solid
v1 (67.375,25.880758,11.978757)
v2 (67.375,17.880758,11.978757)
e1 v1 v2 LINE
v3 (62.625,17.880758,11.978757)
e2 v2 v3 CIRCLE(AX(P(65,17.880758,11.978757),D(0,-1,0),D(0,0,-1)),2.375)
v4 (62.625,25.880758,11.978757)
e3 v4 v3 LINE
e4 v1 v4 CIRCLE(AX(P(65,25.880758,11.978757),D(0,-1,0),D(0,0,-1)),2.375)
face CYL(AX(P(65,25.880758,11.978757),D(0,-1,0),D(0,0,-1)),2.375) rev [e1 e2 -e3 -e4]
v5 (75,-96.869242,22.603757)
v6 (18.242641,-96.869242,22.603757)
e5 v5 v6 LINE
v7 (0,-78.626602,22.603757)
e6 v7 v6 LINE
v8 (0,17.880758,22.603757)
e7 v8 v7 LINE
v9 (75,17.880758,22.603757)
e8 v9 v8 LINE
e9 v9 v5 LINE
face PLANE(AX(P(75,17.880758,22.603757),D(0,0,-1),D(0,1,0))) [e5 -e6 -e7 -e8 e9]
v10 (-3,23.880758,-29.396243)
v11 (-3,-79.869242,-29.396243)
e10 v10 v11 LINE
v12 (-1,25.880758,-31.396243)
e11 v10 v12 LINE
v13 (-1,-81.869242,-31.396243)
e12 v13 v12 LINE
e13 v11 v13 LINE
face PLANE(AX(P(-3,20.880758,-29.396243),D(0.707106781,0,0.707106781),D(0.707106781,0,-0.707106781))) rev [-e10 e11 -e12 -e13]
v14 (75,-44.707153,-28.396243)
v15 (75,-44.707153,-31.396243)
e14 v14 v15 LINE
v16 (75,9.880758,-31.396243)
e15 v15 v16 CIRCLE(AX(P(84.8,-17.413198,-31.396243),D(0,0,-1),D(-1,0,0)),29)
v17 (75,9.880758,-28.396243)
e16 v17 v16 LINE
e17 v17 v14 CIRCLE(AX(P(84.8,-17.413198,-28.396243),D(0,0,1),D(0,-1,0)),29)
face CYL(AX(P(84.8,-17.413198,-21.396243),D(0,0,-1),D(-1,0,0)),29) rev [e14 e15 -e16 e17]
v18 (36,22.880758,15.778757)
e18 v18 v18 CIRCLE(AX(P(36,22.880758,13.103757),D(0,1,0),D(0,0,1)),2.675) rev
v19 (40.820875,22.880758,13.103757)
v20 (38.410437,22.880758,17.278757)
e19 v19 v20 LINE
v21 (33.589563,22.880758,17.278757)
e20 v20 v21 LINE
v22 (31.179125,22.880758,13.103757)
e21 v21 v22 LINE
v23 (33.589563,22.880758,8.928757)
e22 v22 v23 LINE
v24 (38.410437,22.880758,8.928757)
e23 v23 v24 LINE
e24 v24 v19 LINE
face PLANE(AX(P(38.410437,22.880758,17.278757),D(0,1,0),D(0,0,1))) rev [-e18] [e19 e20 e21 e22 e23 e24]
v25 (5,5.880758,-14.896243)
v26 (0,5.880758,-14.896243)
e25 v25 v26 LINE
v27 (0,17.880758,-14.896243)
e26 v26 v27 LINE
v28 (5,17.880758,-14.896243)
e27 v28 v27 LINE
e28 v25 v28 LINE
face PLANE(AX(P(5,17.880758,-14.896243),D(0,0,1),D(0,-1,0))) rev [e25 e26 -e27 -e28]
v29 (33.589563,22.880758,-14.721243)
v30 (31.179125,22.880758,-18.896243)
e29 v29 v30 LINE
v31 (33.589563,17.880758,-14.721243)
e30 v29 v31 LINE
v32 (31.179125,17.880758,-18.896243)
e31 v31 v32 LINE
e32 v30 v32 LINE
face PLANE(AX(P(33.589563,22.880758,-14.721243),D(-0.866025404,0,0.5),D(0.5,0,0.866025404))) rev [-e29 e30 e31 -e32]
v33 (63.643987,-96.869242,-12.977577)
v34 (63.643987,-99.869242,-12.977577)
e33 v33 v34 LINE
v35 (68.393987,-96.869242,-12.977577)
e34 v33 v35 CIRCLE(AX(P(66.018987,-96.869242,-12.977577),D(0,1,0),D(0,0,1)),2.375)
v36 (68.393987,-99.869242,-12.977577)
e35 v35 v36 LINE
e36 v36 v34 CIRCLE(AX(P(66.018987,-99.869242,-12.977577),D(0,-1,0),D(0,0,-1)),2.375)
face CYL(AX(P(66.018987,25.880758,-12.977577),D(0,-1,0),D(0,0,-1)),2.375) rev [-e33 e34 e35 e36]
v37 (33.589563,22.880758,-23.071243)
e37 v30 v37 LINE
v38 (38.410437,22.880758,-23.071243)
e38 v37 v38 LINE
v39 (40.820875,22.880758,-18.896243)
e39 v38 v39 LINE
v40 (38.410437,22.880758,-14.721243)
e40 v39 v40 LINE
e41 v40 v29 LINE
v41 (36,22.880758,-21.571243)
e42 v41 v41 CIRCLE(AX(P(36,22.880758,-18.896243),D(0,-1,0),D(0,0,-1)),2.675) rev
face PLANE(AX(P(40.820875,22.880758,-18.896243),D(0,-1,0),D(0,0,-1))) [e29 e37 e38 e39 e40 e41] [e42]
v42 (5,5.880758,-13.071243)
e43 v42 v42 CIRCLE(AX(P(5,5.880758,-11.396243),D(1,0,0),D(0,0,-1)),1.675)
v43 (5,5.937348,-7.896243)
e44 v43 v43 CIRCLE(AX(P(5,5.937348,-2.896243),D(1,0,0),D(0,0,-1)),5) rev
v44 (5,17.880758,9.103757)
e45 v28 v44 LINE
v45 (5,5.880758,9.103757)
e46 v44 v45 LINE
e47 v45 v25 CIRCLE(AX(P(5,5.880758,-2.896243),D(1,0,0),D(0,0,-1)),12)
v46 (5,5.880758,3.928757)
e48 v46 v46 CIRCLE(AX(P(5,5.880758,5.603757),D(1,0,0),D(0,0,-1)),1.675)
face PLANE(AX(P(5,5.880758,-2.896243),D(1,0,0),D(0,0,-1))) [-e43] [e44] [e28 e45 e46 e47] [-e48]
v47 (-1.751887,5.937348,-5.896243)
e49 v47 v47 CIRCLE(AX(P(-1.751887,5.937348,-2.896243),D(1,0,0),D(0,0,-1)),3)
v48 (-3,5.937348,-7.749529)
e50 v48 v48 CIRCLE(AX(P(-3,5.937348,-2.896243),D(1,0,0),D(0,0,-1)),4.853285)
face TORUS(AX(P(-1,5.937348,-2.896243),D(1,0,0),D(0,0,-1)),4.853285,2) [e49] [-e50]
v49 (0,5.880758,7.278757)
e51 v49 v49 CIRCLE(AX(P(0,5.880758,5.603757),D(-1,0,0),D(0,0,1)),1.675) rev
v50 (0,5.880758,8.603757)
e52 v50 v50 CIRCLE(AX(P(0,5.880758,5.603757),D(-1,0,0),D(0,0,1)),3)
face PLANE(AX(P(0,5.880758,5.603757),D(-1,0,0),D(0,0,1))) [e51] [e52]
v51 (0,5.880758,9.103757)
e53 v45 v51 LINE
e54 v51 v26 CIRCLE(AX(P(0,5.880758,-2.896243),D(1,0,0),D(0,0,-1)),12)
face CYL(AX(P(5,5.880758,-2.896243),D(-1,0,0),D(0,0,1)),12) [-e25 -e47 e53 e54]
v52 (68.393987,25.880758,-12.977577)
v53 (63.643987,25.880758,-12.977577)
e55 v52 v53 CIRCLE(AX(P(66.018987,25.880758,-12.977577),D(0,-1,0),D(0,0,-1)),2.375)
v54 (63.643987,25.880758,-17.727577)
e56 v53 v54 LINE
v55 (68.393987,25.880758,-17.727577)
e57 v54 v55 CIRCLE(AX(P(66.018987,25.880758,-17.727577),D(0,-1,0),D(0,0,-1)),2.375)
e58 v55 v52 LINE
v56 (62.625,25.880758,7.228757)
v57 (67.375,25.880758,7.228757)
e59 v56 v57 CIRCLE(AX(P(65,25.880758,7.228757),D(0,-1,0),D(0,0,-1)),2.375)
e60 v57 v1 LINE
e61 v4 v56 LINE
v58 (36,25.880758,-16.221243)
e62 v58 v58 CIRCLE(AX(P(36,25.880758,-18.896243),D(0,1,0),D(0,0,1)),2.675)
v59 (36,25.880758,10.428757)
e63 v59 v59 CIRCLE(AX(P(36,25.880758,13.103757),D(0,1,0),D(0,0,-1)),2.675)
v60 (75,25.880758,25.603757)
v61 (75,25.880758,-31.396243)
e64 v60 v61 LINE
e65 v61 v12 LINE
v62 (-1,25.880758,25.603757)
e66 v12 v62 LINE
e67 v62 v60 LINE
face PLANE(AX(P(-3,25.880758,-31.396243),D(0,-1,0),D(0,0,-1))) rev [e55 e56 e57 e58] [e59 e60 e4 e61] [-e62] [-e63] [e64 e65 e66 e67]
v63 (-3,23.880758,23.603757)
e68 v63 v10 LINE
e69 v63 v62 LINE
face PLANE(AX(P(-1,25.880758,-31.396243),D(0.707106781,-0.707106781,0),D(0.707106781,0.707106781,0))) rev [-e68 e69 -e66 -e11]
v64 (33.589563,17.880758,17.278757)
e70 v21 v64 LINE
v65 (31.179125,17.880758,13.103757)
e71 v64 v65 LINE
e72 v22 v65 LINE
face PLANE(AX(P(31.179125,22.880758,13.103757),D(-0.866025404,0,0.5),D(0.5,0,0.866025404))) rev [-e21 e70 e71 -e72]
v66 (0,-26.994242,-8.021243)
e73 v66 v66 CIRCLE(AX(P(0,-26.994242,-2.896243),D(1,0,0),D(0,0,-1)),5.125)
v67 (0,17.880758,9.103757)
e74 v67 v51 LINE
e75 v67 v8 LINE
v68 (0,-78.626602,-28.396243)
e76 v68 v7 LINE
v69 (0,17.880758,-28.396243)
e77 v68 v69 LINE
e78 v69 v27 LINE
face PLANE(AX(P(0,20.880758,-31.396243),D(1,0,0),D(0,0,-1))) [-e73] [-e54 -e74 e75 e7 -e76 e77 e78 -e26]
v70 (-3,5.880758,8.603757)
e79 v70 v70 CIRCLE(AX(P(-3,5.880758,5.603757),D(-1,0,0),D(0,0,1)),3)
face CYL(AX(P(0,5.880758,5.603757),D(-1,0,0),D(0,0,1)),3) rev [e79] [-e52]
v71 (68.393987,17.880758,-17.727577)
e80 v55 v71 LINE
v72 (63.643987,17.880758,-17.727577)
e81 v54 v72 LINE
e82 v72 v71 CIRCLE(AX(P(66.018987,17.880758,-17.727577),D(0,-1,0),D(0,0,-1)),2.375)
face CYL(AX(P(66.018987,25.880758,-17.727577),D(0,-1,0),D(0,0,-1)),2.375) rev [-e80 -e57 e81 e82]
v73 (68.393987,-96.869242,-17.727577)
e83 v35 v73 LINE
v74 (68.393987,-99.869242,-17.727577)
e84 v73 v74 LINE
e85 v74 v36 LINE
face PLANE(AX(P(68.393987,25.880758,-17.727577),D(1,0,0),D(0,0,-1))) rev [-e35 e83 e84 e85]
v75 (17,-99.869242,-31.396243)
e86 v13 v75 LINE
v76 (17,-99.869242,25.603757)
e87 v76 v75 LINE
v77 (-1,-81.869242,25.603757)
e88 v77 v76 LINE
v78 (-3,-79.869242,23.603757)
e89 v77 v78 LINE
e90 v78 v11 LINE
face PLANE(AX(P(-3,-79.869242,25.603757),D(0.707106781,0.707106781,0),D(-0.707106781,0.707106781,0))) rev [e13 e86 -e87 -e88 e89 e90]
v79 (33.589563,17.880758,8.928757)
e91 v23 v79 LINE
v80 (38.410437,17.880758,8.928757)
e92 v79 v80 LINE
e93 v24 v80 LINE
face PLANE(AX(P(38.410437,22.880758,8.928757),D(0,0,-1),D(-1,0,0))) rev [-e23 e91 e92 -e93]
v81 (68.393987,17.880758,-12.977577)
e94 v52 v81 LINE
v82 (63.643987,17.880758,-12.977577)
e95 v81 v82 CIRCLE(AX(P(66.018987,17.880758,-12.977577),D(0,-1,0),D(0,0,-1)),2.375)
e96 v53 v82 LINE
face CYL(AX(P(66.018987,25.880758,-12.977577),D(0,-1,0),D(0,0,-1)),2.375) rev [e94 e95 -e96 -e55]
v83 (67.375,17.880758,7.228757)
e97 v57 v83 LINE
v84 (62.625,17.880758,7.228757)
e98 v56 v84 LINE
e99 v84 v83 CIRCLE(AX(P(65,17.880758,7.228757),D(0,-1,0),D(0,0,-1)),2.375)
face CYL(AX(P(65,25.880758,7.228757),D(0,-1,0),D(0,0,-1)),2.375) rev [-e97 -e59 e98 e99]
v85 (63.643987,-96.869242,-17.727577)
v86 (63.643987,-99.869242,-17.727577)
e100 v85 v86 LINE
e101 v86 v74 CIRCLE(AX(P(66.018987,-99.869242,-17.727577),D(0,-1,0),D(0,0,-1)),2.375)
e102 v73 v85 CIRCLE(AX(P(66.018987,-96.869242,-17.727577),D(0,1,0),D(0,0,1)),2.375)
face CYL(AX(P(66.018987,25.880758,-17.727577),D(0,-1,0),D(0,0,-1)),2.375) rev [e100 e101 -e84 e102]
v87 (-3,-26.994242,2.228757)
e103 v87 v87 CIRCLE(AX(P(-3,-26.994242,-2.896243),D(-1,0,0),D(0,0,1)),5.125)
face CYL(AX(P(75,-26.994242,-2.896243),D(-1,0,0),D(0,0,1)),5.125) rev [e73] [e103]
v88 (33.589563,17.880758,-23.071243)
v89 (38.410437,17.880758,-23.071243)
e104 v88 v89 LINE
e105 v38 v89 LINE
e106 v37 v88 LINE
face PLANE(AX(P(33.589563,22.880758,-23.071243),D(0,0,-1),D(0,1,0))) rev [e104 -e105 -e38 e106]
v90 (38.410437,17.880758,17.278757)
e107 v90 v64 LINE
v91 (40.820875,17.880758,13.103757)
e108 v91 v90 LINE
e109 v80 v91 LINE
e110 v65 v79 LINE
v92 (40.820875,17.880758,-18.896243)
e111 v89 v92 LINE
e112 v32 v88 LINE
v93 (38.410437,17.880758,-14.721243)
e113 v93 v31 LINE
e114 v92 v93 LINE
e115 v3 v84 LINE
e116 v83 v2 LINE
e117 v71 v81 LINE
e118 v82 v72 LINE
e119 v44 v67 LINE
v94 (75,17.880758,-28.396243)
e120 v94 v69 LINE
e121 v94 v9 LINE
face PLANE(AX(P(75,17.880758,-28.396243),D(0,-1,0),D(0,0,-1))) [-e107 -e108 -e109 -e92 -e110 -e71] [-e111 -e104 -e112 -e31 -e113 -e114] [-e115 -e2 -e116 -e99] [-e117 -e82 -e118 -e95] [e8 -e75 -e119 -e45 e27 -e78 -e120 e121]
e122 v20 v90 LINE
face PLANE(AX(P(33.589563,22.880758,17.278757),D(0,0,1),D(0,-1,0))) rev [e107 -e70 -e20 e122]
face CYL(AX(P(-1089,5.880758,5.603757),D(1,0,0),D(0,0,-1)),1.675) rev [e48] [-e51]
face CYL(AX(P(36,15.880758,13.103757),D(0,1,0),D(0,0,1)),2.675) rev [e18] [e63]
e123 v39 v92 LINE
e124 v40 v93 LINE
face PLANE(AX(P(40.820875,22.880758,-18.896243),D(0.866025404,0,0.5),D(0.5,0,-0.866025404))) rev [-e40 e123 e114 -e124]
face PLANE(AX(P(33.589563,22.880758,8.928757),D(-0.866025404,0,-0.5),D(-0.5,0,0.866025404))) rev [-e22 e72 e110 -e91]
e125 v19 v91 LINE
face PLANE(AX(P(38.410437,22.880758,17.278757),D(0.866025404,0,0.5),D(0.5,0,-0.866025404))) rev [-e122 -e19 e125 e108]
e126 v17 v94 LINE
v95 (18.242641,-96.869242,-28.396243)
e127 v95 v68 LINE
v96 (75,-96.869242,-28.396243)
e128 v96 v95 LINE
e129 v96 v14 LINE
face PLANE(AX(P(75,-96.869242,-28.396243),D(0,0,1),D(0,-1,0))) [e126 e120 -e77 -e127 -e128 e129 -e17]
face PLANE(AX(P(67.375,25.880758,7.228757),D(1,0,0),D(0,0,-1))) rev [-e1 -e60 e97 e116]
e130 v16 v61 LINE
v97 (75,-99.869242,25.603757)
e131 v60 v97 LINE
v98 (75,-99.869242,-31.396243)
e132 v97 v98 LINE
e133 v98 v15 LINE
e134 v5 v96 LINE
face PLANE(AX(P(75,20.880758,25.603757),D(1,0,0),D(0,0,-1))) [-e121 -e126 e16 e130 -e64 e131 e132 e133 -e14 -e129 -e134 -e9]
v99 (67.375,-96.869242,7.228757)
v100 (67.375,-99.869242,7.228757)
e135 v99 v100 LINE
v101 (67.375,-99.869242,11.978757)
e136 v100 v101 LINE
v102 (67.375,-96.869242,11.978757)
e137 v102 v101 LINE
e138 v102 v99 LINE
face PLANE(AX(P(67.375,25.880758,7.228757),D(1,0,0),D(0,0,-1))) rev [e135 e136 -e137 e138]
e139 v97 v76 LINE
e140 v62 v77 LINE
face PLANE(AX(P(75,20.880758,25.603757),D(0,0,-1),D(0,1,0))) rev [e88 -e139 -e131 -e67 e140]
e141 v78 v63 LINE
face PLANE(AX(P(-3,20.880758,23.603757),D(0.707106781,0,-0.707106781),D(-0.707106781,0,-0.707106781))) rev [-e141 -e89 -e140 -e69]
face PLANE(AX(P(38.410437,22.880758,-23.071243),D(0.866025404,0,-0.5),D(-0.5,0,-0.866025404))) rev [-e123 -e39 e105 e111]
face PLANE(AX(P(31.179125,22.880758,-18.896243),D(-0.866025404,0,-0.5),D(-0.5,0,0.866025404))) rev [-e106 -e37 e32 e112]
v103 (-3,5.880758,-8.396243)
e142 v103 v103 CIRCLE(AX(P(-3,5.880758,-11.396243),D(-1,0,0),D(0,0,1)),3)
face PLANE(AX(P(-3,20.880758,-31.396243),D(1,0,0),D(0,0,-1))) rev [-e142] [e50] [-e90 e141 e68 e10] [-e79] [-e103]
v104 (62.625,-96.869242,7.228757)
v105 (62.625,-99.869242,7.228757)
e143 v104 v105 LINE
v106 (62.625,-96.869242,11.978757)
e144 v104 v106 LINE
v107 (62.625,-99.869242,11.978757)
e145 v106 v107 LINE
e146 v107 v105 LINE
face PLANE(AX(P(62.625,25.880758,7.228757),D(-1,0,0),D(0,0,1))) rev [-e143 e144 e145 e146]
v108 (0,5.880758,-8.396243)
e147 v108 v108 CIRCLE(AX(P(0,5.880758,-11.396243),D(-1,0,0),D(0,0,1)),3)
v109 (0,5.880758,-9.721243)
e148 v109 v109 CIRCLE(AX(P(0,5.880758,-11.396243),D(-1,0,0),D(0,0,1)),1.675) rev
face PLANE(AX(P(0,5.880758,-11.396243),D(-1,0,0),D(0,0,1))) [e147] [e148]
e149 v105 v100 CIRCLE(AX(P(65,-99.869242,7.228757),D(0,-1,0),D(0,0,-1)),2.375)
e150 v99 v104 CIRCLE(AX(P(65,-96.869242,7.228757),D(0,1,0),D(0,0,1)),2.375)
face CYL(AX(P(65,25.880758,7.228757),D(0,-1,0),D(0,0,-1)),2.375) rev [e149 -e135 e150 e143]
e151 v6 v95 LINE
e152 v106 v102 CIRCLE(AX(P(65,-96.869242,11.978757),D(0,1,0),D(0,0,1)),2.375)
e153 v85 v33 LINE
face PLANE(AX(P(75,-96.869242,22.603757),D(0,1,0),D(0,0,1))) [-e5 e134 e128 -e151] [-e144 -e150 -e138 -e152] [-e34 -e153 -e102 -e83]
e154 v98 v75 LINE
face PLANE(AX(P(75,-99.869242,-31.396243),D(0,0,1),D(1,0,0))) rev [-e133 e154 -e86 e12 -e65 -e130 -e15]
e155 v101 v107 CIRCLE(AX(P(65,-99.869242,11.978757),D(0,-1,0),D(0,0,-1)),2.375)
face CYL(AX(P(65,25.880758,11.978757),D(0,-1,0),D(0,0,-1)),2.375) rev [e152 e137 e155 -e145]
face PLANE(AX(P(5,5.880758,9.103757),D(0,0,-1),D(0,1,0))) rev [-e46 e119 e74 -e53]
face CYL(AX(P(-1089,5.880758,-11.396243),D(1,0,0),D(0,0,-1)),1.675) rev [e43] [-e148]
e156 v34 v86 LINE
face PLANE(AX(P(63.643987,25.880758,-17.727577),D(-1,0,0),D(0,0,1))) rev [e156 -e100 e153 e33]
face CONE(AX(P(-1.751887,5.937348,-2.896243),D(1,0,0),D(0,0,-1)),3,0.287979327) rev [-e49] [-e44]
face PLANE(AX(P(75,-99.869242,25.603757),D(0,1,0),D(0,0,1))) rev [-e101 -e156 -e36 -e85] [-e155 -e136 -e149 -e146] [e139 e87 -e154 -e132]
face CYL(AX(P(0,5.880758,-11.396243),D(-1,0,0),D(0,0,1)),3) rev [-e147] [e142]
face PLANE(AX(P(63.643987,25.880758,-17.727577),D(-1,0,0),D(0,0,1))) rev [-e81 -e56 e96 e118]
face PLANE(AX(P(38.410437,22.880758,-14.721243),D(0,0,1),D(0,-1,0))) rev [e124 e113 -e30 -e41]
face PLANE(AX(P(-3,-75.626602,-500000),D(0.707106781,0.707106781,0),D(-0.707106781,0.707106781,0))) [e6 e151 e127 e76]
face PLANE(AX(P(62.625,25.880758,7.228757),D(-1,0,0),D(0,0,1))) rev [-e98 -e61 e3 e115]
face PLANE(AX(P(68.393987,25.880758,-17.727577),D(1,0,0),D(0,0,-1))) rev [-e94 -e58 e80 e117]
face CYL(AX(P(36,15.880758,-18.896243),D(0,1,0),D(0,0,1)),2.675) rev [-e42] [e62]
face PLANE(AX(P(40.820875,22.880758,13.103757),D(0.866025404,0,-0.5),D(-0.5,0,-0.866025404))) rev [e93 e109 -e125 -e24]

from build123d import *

# Parameters (mm, degrees)
SKETCH2_W           = 57
SKETCH2_H           = 120.75
SKETCH2_W_2         = 51
SKETCH2_H_2         = 114.75
BOSS_EXTRUDE1_DEPTH = 75
SKETCH3_W           = 57
SKETCH3_H           = 120.75
BOSS_EXTRUDE2_DEPTH = 3
SKETCH4_W           = 78
SKETCH4_H           = 57
BOSS_EXTRUDE3_DEPTH = 5
SKETCH6_R           = 2.675
CUT_EXTRUDE2_DEPTH  = 10
CUT_EXTRUDE3_DEPTH  = 138.287528874
BOSS_EXTRUDE4_REACH = 139.288
CUT_EXTRUDE7_DEPTH  = 150.745739841
BOSS_EXTRUDE8_DEPTH = 5
SKETCH21_R          = 3
CUT_EXTRUDE11_DEPTH = 1094
CHAMFER2_SIZE       = 2
CHAMFER2_SIZE2      = 6.751886845
SKETCH22_R          = 1.675
CUT_EXTRUDE12_DEPTH = 1094
CUT_EXTRUDE13_DEPTH = 5
SKETCH25_R          = 5.125
CUT_EXTRUDE14_DEPTH = 131.551099899
CHAMFER3_SIZE       = 2
FILLET1_R           = 2
SKETCH27_R          = 3
CUT_EXTRUDE15_DEPTH = 3
CUT_EXTRUDE16_DEPTH = 10


with BuildPart() as part:
    # Sketch2 → Boss-Extrude1 (new body)
    with BuildSketch(Plane(origin=(0, 0, 0), x_dir=(0, 0, -1), z_dir=(1, 0, 0))):
        with Locations((2.896243414, -39.494242434)):
            Rectangle(SKETCH2_W, SKETCH2_H)
        with Locations((2.896243414, -39.494242434)):
            Rectangle(SKETCH2_W_2, SKETCH2_H_2, mode=Mode.SUBTRACT)
    extrude(amount=BOSS_EXTRUDE1_DEPTH)

    # Sketch3 → Boss-Extrude2 (add)
    with BuildSketch(Plane.ZY):
        with Locations((-2.896243414, -39.494242434)):
            Rectangle(SKETCH3_W, SKETCH3_H)
    extrude(amount=BOSS_EXTRUDE2_DEPTH)

    # Sketch4 → Boss-Extrude3 (add)
    with BuildSketch(Plane(origin=(0, 20.880757566, 0), x_dir=(1, 0, 0), z_dir=(0, 1, 0))):
        with Locations((36, 2.896243414)):
            Rectangle(SKETCH4_W, SKETCH4_H)
    extrude(amount=BOSS_EXTRUDE3_DEPTH)

    # Sketch6 → Cut-Extrude2 (cut)
    with BuildSketch(Plane(origin=(0, 25.880757566, 0), x_dir=(1, 0, 0), z_dir=(0, 1, 0))):
        with Locations(Location((36, 18.896243414, 0), (0, 0, 270))):
            Circle(SKETCH6_R)
        with Locations(Location((36, -13.103756586, 0), (0, 0, 90))):
            Circle(SKETCH6_R)
    extrude(amount=-CUT_EXTRUDE2_DEPTH, mode=Mode.SUBTRACT)

    # Sketch8 → Cut-Extrude3 (cut, through all)
    with BuildSketch(Plane(origin=(0, 0, -31.396243414), x_dir=(-1, 0, 0), z_dir=(0, 0, -1))):
        Polygon((3, -99.869242434), (3, -79.869242434), (-17, -99.869242434), align=None)
    extrude(amount=-CUT_EXTRUDE3_DEPTH, mode=Mode.SUBTRACT)

    # Sketch9 → Boss-Extrude4 (add, up to next)
    with BuildSketch(Plane.XY.offset(25.603756586), mode=Mode.PRIVATE) as boss_extrude4_sk1:
        Polygon((-3, -79.869242434), (17, -99.869242434), (21.242640687, -99.869242434), (-3, -75.626601747), align=None)
    boss_extrude4_tool1 = extrude(boss_extrude4_sk1.sketch, amount=-BOSS_EXTRUDE4_REACH, mode=Mode.PRIVATE) - part.part
    add(boss_extrude4_tool1.solids().sort_by_distance((8.094564, -88.774678, 25.603757))[0])

    # Sketch15 → Cut-Extrude7 (cut, through all)
    with BuildSketch(Plane.XZ.offset(99.869242434)):
        with BuildLine():
            Line((62.625, 7.228756586), (62.625, 11.978756586))
            ThreePointArc((62.625, 11.978756586), (65, 14.353756586), (67.375, 11.978756586))
            Line((67.375, 11.978756586), (67.375, 7.228756586))
            ThreePointArc((67.375, 7.228756586), (65, 4.853756586), (62.625, 7.228756586))
        make_face()
        with BuildLine():
            Line((63.643986667, -17.72757696), (63.643986667, -12.97757696))
            ThreePointArc((63.643986667, -12.97757696), (66.018986667, -10.60257696), (68.393986667, -12.97757696))
            Line((68.393986667, -12.97757696), (68.393986667, -17.72757696))
            ThreePointArc((68.393986667, -17.72757696), (66.018986667, -20.10257696), (63.643986667, -17.72757696))
        make_face()
    extrude(amount=-CUT_EXTRUDE7_DEPTH, mode=Mode.SUBTRACT)

    # Sketch20 → Boss-Extrude8 (add)
    with BuildSketch(Plane(origin=(0, 0, 0), x_dir=(0, 0, -1), z_dir=(1, 0, 0))):
        with BuildLine():
            Line((-9.103756586, 5.880757566), (-9.103756586, 17.880757566))
            Line((-9.103756586, 17.880757566), (14.896243414, 17.880757566))
            Line((14.896243414, 17.880757566), (14.896243414, 5.880757566))
            ThreePointArc((14.896243414, 5.880757566), (2.896243414, -6.119242434), (-9.103756586, 5.880757566))
        make_face()
    extrude(amount=BOSS_EXTRUDE8_DEPTH)

    # Sketch21 → Cut-Extrude11 (cut)
    with BuildSketch(Plane(origin=(5, 0, 0), x_dir=(0, 0, -1), z_dir=(1, 0, 0))):
        with Locations((2.896243414, 5.937348)):
            Circle(SKETCH21_R)
    extrude(amount=-CUT_EXTRUDE11_DEPTH, mode=Mode.SUBTRACT)

    # Chamfer2
    chamfer2_edges = [part.edges().sort_by_distance(p)[0] for p in [
        (5, 5.937348, 0.103756586),
    ]]
    chamfer2_side = [part.faces().sort_by_distance(p)[0] for p in [
        (5, 11.880757566, 8.764345331),
    ]]
    chamfer(chamfer2_edges, length=CHAMFER2_SIZE, length2=CHAMFER2_SIZE2, reference=chamfer2_side[0])

    # Sketch22 → Cut-Extrude12 (cut)
    with BuildSketch(Plane(origin=(5, 0, 0), x_dir=(0, 0, -1), z_dir=(1, 0, 0))):
        with Locations((-5.603756586, 5.880757566)):
            Circle(SKETCH22_R)
        with Locations((11.396243414, 5.880757566)):
            Circle(SKETCH22_R)
    extrude(amount=-CUT_EXTRUDE12_DEPTH, mode=Mode.SUBTRACT)

    # Sketch24 → Cut-Extrude13 (cut)
    with BuildSketch(Plane.XZ.offset(-17.880757566)):
        Polygon((40.820874748, -18.896243414), (38.410437374, -14.721243414), (33.589562626, -14.721243414), (31.179125252, -18.896243414), (33.589562626, -23.071243414), (38.410437374, -23.071243414), align=None)
        Polygon((38.410437374, 17.278756586), (40.820874748, 13.103756586), (38.410437374, 8.928756586), (33.589562626, 8.928756586), (31.179125252, 13.103756586), (33.589562626, 17.278756586), align=None)
    extrude(amount=-CUT_EXTRUDE13_DEPTH, mode=Mode.SUBTRACT)

    # Sketch25 → Cut-Extrude14 (cut, through all)
    with BuildSketch(Plane.ZY.offset(3)):
        with Locations((-2.896243414, -26.994242434)):
            Circle(SKETCH25_R)
    extrude(amount=-CUT_EXTRUDE14_DEPTH, mode=Mode.SUBTRACT)

    # Chamfer3
    chamfer3_edges = [part.edges().sort_by_distance(p)[0] for p in [
        (-3, -26.994242434, -31.396243414),
        (-3, 25.880757566, -2.896243414),
        (-3, -26.994242434, 25.603756586),
    ]]
    chamfer(chamfer3_edges, length=CHAMFER3_SIZE)

    # Fillet1
    # the kernel refuses this fillet: 2 mm, written as the material it takes off along each edge
    with BuildSketch(Plane(origin=(-3, 5.937348, -2.896243414), x_dir=(0, 0, -1), z_dir=(0, -1, 0))) as fillet1_piece_1:
        with BuildLine():
            CenterArc((4.853285238, 2), FILLET1_R, 202.082634117, 67.917365883)
            Line((3, 1.248113155), (2.962934295, 1.233075418))
            ThreePointArc((2.962934295, 1.233075418), (2.96, 0.624056577), (2.96, 0))
            Line((2.96, 0), (3, -0.04))
            Line((3, -0.04), (4.853285238, -0.04))
            Line((4.853285238, -0.04), (4.853285238, 0))
        make_face()
    revolve(axis=Axis((-3, 5.937348, -2.896243414), (1, 0, 0)), mode=Mode.SUBTRACT)

    # Sketch27 → Cut-Extrude15 (cut)
    with BuildSketch(Plane.ZY.offset(3)):
        with Locations((-11.396243414, 5.880757566)):
            Circle(SKETCH27_R)
        with Locations((5.603756586, 5.880757566)):
            Circle(SKETCH27_R)
    extrude(amount=-CUT_EXTRUDE15_DEPTH, mode=Mode.SUBTRACT)

    # Sketch28 → Cut-Extrude16 (cut)
    with BuildSketch(Plane(origin=(0, 0, -31.396243414), x_dir=(-1, 0, 0), z_dir=(0, 0, -1))):
        with BuildLine():
            Line((-75, 9.880757566), (-75, -44.707153183))
            ThreePointArc((-75, -44.707153183), (-55.8, -17.413197809), (-75, 9.880757566))
        make_face()
    extrude(amount=-CUT_EXTRUDE16_DEPTH, mode=Mode.SUBTRACT)


solid = part.part
